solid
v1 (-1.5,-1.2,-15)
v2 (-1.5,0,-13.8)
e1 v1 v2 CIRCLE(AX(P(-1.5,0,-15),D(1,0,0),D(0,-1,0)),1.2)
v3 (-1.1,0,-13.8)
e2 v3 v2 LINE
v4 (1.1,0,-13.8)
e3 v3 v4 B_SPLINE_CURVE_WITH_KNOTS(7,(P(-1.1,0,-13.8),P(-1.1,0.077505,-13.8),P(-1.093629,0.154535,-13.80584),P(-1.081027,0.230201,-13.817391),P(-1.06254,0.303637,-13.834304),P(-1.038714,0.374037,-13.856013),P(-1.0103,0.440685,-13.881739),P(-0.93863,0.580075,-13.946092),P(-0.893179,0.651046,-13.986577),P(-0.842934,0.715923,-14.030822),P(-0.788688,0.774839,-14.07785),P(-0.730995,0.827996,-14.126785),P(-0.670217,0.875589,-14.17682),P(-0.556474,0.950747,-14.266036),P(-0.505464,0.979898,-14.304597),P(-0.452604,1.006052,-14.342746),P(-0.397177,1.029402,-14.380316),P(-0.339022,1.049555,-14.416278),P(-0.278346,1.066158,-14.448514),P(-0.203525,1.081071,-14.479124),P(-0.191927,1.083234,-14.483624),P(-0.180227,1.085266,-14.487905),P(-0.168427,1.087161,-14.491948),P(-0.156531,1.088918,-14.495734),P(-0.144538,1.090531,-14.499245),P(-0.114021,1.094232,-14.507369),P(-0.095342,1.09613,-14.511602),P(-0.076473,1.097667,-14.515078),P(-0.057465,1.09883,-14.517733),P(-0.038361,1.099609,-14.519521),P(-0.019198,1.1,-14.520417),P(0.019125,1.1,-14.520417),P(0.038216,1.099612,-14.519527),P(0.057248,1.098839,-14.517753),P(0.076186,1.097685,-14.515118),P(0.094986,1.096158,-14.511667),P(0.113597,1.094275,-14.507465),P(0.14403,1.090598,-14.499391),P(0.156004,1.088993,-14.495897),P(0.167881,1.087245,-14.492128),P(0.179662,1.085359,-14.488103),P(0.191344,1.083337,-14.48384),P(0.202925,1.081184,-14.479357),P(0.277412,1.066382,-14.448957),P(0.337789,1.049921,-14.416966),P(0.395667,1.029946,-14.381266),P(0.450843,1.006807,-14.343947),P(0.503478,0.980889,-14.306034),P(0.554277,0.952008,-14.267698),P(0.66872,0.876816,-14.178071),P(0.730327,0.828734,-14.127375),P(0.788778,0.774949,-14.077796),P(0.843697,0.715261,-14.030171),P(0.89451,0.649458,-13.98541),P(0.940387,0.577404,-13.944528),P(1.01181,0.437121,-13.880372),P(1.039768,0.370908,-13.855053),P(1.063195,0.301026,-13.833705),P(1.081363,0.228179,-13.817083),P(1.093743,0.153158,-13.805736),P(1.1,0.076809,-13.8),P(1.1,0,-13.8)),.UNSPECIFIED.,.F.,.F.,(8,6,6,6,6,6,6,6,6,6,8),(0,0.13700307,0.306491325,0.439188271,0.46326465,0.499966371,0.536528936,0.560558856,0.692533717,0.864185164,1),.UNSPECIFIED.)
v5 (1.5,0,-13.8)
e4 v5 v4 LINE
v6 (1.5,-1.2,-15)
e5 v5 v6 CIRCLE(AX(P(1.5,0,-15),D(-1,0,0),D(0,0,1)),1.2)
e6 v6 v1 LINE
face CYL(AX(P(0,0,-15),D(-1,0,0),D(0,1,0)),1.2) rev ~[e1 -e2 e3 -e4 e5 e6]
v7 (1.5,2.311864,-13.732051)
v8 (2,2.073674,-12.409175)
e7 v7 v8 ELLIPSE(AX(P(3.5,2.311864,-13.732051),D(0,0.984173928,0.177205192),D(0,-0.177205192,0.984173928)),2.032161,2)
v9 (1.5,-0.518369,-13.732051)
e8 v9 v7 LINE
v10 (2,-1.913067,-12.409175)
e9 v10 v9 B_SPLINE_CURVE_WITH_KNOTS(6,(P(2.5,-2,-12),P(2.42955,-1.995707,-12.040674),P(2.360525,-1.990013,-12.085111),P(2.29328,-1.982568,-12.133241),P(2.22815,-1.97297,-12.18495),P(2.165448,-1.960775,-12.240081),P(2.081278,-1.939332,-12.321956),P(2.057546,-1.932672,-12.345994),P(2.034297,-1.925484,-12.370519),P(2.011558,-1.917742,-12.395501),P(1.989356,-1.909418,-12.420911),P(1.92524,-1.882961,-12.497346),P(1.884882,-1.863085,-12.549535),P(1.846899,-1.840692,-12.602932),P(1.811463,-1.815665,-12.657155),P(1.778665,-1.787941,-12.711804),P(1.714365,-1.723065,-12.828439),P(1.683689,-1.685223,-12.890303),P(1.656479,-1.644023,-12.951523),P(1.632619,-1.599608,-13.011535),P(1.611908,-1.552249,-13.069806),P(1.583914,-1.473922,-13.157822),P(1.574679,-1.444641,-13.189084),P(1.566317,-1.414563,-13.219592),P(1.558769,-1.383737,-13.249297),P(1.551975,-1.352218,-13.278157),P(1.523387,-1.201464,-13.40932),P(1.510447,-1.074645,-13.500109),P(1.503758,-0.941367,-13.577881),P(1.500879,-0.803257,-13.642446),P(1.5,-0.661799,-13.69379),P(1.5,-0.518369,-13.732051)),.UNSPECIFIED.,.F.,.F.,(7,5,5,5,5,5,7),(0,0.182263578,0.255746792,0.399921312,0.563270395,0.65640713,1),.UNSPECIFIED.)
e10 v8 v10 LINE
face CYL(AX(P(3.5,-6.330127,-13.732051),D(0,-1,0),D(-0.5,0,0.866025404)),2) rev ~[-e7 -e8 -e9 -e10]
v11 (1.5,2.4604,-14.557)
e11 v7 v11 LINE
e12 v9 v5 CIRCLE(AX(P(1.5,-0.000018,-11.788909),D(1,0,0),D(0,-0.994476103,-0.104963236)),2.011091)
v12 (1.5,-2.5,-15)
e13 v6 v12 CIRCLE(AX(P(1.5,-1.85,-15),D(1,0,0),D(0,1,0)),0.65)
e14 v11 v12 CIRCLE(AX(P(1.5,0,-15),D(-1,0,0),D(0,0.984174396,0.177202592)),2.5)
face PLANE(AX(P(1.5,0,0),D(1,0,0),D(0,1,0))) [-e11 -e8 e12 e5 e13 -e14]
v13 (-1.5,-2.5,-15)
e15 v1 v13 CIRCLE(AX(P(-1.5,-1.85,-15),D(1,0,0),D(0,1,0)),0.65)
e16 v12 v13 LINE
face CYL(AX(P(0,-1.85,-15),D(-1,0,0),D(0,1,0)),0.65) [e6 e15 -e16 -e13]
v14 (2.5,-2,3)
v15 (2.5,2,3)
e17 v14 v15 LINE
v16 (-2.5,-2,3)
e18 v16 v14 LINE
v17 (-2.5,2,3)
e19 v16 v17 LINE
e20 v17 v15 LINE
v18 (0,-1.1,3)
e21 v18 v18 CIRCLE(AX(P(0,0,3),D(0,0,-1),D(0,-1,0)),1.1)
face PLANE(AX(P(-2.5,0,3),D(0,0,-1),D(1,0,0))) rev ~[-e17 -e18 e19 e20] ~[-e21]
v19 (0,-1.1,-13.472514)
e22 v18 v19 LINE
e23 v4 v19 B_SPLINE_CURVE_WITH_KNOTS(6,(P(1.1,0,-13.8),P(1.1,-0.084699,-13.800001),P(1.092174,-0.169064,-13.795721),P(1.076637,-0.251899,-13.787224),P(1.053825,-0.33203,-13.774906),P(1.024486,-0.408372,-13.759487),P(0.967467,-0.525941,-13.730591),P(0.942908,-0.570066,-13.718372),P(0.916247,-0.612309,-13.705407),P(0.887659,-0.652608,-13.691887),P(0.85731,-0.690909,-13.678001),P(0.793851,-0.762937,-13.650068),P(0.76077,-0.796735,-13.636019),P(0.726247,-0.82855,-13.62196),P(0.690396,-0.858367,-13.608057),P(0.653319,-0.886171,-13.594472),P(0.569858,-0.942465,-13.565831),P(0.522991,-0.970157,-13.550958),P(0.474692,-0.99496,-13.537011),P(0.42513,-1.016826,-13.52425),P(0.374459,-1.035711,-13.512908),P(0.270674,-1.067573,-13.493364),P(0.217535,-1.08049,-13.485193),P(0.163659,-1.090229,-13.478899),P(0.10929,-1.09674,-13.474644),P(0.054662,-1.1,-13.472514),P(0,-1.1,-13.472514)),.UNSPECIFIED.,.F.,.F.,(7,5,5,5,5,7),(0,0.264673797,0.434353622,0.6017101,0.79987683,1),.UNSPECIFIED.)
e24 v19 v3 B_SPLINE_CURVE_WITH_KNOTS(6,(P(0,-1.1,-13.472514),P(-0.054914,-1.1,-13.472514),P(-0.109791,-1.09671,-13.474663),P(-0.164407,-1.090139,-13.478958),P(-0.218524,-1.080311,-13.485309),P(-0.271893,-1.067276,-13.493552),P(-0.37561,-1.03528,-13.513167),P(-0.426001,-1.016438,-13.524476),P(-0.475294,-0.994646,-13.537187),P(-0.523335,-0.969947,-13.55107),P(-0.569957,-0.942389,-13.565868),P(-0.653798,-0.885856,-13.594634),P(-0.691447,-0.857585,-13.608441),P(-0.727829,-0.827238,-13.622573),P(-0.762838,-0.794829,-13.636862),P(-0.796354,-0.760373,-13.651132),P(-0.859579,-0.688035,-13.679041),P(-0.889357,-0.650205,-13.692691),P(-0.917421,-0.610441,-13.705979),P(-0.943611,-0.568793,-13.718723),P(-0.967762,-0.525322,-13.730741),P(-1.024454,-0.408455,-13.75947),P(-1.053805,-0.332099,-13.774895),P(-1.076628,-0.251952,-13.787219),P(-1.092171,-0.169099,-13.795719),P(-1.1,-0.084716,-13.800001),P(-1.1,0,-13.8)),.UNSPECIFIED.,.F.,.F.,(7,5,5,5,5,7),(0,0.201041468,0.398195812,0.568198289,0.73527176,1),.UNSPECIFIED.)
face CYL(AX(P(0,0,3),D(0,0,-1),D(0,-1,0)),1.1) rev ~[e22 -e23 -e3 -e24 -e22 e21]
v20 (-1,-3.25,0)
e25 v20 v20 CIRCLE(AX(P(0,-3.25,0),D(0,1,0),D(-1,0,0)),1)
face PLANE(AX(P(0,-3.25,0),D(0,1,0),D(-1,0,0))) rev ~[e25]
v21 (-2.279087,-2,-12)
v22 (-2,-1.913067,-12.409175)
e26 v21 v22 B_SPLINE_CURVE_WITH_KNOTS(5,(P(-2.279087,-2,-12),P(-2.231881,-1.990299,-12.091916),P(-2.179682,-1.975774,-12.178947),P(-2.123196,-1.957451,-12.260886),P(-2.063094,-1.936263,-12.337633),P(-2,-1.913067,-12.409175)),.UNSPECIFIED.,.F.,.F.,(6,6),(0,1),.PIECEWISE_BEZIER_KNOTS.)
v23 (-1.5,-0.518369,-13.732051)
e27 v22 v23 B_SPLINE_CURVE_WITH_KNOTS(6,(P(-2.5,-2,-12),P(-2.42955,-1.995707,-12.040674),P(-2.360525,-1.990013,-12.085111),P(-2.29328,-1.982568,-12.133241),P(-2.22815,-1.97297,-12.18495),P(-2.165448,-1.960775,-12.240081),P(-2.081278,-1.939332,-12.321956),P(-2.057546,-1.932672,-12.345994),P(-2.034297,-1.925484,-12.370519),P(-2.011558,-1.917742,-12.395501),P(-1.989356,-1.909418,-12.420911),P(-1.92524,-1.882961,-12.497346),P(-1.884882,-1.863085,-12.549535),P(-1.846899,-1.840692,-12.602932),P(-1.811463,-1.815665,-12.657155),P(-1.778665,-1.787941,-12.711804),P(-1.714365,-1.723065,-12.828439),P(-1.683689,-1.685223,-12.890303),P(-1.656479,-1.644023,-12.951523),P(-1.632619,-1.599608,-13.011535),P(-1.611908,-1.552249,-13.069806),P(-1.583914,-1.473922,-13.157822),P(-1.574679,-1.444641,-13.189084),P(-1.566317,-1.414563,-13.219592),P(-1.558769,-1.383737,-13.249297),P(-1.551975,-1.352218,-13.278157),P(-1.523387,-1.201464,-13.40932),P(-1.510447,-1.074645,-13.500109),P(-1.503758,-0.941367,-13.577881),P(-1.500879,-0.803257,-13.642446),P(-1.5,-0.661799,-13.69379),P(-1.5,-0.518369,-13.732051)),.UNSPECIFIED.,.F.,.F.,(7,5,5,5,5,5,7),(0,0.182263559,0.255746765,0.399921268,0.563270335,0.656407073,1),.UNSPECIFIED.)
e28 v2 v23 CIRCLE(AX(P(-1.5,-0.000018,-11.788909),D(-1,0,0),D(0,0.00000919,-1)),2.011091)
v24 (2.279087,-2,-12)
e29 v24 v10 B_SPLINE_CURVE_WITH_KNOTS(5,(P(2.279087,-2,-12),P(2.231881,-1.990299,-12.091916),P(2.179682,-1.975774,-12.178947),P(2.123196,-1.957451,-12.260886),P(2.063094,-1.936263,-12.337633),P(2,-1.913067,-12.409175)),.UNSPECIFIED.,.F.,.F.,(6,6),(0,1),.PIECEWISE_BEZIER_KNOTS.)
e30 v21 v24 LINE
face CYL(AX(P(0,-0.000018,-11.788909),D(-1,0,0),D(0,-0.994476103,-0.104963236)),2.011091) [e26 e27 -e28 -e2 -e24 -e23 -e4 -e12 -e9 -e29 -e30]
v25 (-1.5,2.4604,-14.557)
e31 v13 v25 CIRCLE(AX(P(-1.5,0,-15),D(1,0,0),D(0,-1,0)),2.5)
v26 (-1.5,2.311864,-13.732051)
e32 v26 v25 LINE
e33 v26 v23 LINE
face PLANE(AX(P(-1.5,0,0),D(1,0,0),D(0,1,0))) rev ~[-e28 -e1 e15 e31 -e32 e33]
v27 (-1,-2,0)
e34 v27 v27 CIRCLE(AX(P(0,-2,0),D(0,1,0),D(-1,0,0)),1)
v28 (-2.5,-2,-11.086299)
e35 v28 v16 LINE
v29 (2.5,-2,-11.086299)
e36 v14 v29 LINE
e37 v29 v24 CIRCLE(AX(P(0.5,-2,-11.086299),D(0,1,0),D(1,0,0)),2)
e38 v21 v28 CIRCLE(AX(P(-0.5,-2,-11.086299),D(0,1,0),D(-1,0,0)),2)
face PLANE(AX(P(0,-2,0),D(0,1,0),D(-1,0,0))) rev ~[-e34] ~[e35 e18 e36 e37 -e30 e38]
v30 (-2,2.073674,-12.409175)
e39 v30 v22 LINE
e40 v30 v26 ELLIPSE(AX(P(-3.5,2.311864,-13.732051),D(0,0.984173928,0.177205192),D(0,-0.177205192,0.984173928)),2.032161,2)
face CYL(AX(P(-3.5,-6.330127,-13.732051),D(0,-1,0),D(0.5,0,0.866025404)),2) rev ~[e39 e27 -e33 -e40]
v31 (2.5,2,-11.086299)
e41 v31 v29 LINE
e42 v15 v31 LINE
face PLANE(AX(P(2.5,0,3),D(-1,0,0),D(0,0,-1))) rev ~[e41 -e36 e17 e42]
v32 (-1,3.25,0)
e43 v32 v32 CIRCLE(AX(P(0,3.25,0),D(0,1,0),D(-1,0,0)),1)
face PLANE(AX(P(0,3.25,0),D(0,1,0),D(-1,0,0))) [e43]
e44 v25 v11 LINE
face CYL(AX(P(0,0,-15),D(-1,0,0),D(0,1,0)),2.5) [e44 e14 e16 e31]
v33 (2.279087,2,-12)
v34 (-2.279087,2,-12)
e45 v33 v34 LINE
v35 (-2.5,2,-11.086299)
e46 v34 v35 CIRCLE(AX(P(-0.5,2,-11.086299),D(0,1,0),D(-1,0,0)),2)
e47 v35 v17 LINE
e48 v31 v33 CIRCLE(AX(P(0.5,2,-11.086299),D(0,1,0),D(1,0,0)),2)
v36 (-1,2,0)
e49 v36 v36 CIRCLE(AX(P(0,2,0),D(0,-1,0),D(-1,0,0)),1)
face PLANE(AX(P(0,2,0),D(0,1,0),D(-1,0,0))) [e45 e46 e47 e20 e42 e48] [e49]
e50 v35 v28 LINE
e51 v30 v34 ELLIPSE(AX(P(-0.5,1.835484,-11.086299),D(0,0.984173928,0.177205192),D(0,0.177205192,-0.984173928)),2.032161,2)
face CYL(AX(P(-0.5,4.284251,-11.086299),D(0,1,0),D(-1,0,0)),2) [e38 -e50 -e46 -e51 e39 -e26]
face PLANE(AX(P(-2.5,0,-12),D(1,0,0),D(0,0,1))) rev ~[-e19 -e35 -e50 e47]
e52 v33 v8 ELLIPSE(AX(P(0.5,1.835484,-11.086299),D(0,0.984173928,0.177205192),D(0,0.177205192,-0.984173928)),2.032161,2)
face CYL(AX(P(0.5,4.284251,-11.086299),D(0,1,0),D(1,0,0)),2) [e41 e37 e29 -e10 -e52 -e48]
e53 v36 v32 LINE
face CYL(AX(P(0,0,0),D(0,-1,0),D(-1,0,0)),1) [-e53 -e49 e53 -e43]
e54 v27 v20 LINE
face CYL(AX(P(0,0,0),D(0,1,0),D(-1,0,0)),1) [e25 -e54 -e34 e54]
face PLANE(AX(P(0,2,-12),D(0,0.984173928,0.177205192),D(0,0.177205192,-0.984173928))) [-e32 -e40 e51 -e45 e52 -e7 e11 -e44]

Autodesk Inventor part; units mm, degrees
ref_plane "YZ Plane" through (0, 0, 0) normal (1, 0, 0) x (0, 1, 0)
ref_plane "XZ Plane" through (0, 0, 0) normal (0, 1, 0) x (-1, 0, 0)
ref_plane "XY Plane" through (0, 0, 0) normal (0, 0, 1) x (1, 0, 0)
sketch "スケッチ1" plane through (0, 0, 0) normal (0, 1, 0) x (-1, 0, 0)
  line L0 (2.5, 3) -> (-2.5, 3)
  line L1 (-2.5, 3) -> (-2.5, -12)
  line L2 (-2.5, -12) -> (2.5, -12)
  line L3 (2.5, -12) -> (2.5, 3)
  point P0 (0, 0)
  point P1 (0, 3)
  dimension "d0" = 5
  dimension "d15" = 15
  dimension "d46" = 3
extrude "押し出し1" add sketch "スケッチ1" along normal mid plane 4
sketch "スケッチ2" plane through (0, 0, 0) normal (0, 1, 0) x (-1, 0, 0)
  circle A0 centre (0, 0) radius 1
  dimension "d3" = 2
extrude "押し出し2" add sketch "スケッチ2" along normal mid plane 6.5
sketch "スケッチ5" plane through (-2.5, 2, 3) normal (0, 0, 1) x (1, 0, 0)
  point P0 (2.5, -2)
  point P1 (2.5, -2)
hole "加工用" [suppressed]
sketch "スケッチ8" plane through (0, 0, 0) normal (1, 0, 0) x (0, 1, 0)
  circle A0 centre (0, -15) radius 2.5
  circle A1 centre (0, -15) radius 1.2
  line L0 (-2, -12) -> (-2.4604, -14.557)
  line L1 (2, -12) -> (2.4604, -14.557)
  line L2 (-2, -12) -> (2, -12) projected
  line L3 (-2, -12) -> (2, -12) projected
  circle A2 centre (-1.85, -15) radius 0.65
  arc A3 (-2, -12) -> (0, -13.8) centre (0, -11.7889) ccw
  point P0 (0, 0)
  point P1 (1, -4)
  point P2 (-1, -4)
  point P3 (0, -12)
  point P4 (0, -12)
  point P5 (-1.2, -15)
  point P6 (-2.5, -15)
  point P7 (0, -12)
  point P8 (-1.5657, -13.051)
  dimension "d33" = 2.4
  dimension "d34" = 5
  dimension "d42" = 3
extrude "押し出し4" add sketch "スケッチ8" along normal mid plane 3 contours A0 A2 A1 A3 | A0 A3 L2 L1 | A2 picked at (-1.463, -16.0204)
fillet "フィレット1" radius 2 4 edges at (-1.5, 0, -12) (-2.5, 0, -12) (1.5, 0, -12) (2.5, 0, -12)
sketch "スケッチ6" plane through (-2.5, 2, 3) normal (0, 0, 1) x (1, 0, 0)
  point P0 (2.5, -2)
  point P1 (2.5, -2)
hole "穴3" at (0, 0, 3) direction (0, 0, -1) diameter 2.2 end up to surface
properties part number "gear_2" material "ABS プラスチック"
